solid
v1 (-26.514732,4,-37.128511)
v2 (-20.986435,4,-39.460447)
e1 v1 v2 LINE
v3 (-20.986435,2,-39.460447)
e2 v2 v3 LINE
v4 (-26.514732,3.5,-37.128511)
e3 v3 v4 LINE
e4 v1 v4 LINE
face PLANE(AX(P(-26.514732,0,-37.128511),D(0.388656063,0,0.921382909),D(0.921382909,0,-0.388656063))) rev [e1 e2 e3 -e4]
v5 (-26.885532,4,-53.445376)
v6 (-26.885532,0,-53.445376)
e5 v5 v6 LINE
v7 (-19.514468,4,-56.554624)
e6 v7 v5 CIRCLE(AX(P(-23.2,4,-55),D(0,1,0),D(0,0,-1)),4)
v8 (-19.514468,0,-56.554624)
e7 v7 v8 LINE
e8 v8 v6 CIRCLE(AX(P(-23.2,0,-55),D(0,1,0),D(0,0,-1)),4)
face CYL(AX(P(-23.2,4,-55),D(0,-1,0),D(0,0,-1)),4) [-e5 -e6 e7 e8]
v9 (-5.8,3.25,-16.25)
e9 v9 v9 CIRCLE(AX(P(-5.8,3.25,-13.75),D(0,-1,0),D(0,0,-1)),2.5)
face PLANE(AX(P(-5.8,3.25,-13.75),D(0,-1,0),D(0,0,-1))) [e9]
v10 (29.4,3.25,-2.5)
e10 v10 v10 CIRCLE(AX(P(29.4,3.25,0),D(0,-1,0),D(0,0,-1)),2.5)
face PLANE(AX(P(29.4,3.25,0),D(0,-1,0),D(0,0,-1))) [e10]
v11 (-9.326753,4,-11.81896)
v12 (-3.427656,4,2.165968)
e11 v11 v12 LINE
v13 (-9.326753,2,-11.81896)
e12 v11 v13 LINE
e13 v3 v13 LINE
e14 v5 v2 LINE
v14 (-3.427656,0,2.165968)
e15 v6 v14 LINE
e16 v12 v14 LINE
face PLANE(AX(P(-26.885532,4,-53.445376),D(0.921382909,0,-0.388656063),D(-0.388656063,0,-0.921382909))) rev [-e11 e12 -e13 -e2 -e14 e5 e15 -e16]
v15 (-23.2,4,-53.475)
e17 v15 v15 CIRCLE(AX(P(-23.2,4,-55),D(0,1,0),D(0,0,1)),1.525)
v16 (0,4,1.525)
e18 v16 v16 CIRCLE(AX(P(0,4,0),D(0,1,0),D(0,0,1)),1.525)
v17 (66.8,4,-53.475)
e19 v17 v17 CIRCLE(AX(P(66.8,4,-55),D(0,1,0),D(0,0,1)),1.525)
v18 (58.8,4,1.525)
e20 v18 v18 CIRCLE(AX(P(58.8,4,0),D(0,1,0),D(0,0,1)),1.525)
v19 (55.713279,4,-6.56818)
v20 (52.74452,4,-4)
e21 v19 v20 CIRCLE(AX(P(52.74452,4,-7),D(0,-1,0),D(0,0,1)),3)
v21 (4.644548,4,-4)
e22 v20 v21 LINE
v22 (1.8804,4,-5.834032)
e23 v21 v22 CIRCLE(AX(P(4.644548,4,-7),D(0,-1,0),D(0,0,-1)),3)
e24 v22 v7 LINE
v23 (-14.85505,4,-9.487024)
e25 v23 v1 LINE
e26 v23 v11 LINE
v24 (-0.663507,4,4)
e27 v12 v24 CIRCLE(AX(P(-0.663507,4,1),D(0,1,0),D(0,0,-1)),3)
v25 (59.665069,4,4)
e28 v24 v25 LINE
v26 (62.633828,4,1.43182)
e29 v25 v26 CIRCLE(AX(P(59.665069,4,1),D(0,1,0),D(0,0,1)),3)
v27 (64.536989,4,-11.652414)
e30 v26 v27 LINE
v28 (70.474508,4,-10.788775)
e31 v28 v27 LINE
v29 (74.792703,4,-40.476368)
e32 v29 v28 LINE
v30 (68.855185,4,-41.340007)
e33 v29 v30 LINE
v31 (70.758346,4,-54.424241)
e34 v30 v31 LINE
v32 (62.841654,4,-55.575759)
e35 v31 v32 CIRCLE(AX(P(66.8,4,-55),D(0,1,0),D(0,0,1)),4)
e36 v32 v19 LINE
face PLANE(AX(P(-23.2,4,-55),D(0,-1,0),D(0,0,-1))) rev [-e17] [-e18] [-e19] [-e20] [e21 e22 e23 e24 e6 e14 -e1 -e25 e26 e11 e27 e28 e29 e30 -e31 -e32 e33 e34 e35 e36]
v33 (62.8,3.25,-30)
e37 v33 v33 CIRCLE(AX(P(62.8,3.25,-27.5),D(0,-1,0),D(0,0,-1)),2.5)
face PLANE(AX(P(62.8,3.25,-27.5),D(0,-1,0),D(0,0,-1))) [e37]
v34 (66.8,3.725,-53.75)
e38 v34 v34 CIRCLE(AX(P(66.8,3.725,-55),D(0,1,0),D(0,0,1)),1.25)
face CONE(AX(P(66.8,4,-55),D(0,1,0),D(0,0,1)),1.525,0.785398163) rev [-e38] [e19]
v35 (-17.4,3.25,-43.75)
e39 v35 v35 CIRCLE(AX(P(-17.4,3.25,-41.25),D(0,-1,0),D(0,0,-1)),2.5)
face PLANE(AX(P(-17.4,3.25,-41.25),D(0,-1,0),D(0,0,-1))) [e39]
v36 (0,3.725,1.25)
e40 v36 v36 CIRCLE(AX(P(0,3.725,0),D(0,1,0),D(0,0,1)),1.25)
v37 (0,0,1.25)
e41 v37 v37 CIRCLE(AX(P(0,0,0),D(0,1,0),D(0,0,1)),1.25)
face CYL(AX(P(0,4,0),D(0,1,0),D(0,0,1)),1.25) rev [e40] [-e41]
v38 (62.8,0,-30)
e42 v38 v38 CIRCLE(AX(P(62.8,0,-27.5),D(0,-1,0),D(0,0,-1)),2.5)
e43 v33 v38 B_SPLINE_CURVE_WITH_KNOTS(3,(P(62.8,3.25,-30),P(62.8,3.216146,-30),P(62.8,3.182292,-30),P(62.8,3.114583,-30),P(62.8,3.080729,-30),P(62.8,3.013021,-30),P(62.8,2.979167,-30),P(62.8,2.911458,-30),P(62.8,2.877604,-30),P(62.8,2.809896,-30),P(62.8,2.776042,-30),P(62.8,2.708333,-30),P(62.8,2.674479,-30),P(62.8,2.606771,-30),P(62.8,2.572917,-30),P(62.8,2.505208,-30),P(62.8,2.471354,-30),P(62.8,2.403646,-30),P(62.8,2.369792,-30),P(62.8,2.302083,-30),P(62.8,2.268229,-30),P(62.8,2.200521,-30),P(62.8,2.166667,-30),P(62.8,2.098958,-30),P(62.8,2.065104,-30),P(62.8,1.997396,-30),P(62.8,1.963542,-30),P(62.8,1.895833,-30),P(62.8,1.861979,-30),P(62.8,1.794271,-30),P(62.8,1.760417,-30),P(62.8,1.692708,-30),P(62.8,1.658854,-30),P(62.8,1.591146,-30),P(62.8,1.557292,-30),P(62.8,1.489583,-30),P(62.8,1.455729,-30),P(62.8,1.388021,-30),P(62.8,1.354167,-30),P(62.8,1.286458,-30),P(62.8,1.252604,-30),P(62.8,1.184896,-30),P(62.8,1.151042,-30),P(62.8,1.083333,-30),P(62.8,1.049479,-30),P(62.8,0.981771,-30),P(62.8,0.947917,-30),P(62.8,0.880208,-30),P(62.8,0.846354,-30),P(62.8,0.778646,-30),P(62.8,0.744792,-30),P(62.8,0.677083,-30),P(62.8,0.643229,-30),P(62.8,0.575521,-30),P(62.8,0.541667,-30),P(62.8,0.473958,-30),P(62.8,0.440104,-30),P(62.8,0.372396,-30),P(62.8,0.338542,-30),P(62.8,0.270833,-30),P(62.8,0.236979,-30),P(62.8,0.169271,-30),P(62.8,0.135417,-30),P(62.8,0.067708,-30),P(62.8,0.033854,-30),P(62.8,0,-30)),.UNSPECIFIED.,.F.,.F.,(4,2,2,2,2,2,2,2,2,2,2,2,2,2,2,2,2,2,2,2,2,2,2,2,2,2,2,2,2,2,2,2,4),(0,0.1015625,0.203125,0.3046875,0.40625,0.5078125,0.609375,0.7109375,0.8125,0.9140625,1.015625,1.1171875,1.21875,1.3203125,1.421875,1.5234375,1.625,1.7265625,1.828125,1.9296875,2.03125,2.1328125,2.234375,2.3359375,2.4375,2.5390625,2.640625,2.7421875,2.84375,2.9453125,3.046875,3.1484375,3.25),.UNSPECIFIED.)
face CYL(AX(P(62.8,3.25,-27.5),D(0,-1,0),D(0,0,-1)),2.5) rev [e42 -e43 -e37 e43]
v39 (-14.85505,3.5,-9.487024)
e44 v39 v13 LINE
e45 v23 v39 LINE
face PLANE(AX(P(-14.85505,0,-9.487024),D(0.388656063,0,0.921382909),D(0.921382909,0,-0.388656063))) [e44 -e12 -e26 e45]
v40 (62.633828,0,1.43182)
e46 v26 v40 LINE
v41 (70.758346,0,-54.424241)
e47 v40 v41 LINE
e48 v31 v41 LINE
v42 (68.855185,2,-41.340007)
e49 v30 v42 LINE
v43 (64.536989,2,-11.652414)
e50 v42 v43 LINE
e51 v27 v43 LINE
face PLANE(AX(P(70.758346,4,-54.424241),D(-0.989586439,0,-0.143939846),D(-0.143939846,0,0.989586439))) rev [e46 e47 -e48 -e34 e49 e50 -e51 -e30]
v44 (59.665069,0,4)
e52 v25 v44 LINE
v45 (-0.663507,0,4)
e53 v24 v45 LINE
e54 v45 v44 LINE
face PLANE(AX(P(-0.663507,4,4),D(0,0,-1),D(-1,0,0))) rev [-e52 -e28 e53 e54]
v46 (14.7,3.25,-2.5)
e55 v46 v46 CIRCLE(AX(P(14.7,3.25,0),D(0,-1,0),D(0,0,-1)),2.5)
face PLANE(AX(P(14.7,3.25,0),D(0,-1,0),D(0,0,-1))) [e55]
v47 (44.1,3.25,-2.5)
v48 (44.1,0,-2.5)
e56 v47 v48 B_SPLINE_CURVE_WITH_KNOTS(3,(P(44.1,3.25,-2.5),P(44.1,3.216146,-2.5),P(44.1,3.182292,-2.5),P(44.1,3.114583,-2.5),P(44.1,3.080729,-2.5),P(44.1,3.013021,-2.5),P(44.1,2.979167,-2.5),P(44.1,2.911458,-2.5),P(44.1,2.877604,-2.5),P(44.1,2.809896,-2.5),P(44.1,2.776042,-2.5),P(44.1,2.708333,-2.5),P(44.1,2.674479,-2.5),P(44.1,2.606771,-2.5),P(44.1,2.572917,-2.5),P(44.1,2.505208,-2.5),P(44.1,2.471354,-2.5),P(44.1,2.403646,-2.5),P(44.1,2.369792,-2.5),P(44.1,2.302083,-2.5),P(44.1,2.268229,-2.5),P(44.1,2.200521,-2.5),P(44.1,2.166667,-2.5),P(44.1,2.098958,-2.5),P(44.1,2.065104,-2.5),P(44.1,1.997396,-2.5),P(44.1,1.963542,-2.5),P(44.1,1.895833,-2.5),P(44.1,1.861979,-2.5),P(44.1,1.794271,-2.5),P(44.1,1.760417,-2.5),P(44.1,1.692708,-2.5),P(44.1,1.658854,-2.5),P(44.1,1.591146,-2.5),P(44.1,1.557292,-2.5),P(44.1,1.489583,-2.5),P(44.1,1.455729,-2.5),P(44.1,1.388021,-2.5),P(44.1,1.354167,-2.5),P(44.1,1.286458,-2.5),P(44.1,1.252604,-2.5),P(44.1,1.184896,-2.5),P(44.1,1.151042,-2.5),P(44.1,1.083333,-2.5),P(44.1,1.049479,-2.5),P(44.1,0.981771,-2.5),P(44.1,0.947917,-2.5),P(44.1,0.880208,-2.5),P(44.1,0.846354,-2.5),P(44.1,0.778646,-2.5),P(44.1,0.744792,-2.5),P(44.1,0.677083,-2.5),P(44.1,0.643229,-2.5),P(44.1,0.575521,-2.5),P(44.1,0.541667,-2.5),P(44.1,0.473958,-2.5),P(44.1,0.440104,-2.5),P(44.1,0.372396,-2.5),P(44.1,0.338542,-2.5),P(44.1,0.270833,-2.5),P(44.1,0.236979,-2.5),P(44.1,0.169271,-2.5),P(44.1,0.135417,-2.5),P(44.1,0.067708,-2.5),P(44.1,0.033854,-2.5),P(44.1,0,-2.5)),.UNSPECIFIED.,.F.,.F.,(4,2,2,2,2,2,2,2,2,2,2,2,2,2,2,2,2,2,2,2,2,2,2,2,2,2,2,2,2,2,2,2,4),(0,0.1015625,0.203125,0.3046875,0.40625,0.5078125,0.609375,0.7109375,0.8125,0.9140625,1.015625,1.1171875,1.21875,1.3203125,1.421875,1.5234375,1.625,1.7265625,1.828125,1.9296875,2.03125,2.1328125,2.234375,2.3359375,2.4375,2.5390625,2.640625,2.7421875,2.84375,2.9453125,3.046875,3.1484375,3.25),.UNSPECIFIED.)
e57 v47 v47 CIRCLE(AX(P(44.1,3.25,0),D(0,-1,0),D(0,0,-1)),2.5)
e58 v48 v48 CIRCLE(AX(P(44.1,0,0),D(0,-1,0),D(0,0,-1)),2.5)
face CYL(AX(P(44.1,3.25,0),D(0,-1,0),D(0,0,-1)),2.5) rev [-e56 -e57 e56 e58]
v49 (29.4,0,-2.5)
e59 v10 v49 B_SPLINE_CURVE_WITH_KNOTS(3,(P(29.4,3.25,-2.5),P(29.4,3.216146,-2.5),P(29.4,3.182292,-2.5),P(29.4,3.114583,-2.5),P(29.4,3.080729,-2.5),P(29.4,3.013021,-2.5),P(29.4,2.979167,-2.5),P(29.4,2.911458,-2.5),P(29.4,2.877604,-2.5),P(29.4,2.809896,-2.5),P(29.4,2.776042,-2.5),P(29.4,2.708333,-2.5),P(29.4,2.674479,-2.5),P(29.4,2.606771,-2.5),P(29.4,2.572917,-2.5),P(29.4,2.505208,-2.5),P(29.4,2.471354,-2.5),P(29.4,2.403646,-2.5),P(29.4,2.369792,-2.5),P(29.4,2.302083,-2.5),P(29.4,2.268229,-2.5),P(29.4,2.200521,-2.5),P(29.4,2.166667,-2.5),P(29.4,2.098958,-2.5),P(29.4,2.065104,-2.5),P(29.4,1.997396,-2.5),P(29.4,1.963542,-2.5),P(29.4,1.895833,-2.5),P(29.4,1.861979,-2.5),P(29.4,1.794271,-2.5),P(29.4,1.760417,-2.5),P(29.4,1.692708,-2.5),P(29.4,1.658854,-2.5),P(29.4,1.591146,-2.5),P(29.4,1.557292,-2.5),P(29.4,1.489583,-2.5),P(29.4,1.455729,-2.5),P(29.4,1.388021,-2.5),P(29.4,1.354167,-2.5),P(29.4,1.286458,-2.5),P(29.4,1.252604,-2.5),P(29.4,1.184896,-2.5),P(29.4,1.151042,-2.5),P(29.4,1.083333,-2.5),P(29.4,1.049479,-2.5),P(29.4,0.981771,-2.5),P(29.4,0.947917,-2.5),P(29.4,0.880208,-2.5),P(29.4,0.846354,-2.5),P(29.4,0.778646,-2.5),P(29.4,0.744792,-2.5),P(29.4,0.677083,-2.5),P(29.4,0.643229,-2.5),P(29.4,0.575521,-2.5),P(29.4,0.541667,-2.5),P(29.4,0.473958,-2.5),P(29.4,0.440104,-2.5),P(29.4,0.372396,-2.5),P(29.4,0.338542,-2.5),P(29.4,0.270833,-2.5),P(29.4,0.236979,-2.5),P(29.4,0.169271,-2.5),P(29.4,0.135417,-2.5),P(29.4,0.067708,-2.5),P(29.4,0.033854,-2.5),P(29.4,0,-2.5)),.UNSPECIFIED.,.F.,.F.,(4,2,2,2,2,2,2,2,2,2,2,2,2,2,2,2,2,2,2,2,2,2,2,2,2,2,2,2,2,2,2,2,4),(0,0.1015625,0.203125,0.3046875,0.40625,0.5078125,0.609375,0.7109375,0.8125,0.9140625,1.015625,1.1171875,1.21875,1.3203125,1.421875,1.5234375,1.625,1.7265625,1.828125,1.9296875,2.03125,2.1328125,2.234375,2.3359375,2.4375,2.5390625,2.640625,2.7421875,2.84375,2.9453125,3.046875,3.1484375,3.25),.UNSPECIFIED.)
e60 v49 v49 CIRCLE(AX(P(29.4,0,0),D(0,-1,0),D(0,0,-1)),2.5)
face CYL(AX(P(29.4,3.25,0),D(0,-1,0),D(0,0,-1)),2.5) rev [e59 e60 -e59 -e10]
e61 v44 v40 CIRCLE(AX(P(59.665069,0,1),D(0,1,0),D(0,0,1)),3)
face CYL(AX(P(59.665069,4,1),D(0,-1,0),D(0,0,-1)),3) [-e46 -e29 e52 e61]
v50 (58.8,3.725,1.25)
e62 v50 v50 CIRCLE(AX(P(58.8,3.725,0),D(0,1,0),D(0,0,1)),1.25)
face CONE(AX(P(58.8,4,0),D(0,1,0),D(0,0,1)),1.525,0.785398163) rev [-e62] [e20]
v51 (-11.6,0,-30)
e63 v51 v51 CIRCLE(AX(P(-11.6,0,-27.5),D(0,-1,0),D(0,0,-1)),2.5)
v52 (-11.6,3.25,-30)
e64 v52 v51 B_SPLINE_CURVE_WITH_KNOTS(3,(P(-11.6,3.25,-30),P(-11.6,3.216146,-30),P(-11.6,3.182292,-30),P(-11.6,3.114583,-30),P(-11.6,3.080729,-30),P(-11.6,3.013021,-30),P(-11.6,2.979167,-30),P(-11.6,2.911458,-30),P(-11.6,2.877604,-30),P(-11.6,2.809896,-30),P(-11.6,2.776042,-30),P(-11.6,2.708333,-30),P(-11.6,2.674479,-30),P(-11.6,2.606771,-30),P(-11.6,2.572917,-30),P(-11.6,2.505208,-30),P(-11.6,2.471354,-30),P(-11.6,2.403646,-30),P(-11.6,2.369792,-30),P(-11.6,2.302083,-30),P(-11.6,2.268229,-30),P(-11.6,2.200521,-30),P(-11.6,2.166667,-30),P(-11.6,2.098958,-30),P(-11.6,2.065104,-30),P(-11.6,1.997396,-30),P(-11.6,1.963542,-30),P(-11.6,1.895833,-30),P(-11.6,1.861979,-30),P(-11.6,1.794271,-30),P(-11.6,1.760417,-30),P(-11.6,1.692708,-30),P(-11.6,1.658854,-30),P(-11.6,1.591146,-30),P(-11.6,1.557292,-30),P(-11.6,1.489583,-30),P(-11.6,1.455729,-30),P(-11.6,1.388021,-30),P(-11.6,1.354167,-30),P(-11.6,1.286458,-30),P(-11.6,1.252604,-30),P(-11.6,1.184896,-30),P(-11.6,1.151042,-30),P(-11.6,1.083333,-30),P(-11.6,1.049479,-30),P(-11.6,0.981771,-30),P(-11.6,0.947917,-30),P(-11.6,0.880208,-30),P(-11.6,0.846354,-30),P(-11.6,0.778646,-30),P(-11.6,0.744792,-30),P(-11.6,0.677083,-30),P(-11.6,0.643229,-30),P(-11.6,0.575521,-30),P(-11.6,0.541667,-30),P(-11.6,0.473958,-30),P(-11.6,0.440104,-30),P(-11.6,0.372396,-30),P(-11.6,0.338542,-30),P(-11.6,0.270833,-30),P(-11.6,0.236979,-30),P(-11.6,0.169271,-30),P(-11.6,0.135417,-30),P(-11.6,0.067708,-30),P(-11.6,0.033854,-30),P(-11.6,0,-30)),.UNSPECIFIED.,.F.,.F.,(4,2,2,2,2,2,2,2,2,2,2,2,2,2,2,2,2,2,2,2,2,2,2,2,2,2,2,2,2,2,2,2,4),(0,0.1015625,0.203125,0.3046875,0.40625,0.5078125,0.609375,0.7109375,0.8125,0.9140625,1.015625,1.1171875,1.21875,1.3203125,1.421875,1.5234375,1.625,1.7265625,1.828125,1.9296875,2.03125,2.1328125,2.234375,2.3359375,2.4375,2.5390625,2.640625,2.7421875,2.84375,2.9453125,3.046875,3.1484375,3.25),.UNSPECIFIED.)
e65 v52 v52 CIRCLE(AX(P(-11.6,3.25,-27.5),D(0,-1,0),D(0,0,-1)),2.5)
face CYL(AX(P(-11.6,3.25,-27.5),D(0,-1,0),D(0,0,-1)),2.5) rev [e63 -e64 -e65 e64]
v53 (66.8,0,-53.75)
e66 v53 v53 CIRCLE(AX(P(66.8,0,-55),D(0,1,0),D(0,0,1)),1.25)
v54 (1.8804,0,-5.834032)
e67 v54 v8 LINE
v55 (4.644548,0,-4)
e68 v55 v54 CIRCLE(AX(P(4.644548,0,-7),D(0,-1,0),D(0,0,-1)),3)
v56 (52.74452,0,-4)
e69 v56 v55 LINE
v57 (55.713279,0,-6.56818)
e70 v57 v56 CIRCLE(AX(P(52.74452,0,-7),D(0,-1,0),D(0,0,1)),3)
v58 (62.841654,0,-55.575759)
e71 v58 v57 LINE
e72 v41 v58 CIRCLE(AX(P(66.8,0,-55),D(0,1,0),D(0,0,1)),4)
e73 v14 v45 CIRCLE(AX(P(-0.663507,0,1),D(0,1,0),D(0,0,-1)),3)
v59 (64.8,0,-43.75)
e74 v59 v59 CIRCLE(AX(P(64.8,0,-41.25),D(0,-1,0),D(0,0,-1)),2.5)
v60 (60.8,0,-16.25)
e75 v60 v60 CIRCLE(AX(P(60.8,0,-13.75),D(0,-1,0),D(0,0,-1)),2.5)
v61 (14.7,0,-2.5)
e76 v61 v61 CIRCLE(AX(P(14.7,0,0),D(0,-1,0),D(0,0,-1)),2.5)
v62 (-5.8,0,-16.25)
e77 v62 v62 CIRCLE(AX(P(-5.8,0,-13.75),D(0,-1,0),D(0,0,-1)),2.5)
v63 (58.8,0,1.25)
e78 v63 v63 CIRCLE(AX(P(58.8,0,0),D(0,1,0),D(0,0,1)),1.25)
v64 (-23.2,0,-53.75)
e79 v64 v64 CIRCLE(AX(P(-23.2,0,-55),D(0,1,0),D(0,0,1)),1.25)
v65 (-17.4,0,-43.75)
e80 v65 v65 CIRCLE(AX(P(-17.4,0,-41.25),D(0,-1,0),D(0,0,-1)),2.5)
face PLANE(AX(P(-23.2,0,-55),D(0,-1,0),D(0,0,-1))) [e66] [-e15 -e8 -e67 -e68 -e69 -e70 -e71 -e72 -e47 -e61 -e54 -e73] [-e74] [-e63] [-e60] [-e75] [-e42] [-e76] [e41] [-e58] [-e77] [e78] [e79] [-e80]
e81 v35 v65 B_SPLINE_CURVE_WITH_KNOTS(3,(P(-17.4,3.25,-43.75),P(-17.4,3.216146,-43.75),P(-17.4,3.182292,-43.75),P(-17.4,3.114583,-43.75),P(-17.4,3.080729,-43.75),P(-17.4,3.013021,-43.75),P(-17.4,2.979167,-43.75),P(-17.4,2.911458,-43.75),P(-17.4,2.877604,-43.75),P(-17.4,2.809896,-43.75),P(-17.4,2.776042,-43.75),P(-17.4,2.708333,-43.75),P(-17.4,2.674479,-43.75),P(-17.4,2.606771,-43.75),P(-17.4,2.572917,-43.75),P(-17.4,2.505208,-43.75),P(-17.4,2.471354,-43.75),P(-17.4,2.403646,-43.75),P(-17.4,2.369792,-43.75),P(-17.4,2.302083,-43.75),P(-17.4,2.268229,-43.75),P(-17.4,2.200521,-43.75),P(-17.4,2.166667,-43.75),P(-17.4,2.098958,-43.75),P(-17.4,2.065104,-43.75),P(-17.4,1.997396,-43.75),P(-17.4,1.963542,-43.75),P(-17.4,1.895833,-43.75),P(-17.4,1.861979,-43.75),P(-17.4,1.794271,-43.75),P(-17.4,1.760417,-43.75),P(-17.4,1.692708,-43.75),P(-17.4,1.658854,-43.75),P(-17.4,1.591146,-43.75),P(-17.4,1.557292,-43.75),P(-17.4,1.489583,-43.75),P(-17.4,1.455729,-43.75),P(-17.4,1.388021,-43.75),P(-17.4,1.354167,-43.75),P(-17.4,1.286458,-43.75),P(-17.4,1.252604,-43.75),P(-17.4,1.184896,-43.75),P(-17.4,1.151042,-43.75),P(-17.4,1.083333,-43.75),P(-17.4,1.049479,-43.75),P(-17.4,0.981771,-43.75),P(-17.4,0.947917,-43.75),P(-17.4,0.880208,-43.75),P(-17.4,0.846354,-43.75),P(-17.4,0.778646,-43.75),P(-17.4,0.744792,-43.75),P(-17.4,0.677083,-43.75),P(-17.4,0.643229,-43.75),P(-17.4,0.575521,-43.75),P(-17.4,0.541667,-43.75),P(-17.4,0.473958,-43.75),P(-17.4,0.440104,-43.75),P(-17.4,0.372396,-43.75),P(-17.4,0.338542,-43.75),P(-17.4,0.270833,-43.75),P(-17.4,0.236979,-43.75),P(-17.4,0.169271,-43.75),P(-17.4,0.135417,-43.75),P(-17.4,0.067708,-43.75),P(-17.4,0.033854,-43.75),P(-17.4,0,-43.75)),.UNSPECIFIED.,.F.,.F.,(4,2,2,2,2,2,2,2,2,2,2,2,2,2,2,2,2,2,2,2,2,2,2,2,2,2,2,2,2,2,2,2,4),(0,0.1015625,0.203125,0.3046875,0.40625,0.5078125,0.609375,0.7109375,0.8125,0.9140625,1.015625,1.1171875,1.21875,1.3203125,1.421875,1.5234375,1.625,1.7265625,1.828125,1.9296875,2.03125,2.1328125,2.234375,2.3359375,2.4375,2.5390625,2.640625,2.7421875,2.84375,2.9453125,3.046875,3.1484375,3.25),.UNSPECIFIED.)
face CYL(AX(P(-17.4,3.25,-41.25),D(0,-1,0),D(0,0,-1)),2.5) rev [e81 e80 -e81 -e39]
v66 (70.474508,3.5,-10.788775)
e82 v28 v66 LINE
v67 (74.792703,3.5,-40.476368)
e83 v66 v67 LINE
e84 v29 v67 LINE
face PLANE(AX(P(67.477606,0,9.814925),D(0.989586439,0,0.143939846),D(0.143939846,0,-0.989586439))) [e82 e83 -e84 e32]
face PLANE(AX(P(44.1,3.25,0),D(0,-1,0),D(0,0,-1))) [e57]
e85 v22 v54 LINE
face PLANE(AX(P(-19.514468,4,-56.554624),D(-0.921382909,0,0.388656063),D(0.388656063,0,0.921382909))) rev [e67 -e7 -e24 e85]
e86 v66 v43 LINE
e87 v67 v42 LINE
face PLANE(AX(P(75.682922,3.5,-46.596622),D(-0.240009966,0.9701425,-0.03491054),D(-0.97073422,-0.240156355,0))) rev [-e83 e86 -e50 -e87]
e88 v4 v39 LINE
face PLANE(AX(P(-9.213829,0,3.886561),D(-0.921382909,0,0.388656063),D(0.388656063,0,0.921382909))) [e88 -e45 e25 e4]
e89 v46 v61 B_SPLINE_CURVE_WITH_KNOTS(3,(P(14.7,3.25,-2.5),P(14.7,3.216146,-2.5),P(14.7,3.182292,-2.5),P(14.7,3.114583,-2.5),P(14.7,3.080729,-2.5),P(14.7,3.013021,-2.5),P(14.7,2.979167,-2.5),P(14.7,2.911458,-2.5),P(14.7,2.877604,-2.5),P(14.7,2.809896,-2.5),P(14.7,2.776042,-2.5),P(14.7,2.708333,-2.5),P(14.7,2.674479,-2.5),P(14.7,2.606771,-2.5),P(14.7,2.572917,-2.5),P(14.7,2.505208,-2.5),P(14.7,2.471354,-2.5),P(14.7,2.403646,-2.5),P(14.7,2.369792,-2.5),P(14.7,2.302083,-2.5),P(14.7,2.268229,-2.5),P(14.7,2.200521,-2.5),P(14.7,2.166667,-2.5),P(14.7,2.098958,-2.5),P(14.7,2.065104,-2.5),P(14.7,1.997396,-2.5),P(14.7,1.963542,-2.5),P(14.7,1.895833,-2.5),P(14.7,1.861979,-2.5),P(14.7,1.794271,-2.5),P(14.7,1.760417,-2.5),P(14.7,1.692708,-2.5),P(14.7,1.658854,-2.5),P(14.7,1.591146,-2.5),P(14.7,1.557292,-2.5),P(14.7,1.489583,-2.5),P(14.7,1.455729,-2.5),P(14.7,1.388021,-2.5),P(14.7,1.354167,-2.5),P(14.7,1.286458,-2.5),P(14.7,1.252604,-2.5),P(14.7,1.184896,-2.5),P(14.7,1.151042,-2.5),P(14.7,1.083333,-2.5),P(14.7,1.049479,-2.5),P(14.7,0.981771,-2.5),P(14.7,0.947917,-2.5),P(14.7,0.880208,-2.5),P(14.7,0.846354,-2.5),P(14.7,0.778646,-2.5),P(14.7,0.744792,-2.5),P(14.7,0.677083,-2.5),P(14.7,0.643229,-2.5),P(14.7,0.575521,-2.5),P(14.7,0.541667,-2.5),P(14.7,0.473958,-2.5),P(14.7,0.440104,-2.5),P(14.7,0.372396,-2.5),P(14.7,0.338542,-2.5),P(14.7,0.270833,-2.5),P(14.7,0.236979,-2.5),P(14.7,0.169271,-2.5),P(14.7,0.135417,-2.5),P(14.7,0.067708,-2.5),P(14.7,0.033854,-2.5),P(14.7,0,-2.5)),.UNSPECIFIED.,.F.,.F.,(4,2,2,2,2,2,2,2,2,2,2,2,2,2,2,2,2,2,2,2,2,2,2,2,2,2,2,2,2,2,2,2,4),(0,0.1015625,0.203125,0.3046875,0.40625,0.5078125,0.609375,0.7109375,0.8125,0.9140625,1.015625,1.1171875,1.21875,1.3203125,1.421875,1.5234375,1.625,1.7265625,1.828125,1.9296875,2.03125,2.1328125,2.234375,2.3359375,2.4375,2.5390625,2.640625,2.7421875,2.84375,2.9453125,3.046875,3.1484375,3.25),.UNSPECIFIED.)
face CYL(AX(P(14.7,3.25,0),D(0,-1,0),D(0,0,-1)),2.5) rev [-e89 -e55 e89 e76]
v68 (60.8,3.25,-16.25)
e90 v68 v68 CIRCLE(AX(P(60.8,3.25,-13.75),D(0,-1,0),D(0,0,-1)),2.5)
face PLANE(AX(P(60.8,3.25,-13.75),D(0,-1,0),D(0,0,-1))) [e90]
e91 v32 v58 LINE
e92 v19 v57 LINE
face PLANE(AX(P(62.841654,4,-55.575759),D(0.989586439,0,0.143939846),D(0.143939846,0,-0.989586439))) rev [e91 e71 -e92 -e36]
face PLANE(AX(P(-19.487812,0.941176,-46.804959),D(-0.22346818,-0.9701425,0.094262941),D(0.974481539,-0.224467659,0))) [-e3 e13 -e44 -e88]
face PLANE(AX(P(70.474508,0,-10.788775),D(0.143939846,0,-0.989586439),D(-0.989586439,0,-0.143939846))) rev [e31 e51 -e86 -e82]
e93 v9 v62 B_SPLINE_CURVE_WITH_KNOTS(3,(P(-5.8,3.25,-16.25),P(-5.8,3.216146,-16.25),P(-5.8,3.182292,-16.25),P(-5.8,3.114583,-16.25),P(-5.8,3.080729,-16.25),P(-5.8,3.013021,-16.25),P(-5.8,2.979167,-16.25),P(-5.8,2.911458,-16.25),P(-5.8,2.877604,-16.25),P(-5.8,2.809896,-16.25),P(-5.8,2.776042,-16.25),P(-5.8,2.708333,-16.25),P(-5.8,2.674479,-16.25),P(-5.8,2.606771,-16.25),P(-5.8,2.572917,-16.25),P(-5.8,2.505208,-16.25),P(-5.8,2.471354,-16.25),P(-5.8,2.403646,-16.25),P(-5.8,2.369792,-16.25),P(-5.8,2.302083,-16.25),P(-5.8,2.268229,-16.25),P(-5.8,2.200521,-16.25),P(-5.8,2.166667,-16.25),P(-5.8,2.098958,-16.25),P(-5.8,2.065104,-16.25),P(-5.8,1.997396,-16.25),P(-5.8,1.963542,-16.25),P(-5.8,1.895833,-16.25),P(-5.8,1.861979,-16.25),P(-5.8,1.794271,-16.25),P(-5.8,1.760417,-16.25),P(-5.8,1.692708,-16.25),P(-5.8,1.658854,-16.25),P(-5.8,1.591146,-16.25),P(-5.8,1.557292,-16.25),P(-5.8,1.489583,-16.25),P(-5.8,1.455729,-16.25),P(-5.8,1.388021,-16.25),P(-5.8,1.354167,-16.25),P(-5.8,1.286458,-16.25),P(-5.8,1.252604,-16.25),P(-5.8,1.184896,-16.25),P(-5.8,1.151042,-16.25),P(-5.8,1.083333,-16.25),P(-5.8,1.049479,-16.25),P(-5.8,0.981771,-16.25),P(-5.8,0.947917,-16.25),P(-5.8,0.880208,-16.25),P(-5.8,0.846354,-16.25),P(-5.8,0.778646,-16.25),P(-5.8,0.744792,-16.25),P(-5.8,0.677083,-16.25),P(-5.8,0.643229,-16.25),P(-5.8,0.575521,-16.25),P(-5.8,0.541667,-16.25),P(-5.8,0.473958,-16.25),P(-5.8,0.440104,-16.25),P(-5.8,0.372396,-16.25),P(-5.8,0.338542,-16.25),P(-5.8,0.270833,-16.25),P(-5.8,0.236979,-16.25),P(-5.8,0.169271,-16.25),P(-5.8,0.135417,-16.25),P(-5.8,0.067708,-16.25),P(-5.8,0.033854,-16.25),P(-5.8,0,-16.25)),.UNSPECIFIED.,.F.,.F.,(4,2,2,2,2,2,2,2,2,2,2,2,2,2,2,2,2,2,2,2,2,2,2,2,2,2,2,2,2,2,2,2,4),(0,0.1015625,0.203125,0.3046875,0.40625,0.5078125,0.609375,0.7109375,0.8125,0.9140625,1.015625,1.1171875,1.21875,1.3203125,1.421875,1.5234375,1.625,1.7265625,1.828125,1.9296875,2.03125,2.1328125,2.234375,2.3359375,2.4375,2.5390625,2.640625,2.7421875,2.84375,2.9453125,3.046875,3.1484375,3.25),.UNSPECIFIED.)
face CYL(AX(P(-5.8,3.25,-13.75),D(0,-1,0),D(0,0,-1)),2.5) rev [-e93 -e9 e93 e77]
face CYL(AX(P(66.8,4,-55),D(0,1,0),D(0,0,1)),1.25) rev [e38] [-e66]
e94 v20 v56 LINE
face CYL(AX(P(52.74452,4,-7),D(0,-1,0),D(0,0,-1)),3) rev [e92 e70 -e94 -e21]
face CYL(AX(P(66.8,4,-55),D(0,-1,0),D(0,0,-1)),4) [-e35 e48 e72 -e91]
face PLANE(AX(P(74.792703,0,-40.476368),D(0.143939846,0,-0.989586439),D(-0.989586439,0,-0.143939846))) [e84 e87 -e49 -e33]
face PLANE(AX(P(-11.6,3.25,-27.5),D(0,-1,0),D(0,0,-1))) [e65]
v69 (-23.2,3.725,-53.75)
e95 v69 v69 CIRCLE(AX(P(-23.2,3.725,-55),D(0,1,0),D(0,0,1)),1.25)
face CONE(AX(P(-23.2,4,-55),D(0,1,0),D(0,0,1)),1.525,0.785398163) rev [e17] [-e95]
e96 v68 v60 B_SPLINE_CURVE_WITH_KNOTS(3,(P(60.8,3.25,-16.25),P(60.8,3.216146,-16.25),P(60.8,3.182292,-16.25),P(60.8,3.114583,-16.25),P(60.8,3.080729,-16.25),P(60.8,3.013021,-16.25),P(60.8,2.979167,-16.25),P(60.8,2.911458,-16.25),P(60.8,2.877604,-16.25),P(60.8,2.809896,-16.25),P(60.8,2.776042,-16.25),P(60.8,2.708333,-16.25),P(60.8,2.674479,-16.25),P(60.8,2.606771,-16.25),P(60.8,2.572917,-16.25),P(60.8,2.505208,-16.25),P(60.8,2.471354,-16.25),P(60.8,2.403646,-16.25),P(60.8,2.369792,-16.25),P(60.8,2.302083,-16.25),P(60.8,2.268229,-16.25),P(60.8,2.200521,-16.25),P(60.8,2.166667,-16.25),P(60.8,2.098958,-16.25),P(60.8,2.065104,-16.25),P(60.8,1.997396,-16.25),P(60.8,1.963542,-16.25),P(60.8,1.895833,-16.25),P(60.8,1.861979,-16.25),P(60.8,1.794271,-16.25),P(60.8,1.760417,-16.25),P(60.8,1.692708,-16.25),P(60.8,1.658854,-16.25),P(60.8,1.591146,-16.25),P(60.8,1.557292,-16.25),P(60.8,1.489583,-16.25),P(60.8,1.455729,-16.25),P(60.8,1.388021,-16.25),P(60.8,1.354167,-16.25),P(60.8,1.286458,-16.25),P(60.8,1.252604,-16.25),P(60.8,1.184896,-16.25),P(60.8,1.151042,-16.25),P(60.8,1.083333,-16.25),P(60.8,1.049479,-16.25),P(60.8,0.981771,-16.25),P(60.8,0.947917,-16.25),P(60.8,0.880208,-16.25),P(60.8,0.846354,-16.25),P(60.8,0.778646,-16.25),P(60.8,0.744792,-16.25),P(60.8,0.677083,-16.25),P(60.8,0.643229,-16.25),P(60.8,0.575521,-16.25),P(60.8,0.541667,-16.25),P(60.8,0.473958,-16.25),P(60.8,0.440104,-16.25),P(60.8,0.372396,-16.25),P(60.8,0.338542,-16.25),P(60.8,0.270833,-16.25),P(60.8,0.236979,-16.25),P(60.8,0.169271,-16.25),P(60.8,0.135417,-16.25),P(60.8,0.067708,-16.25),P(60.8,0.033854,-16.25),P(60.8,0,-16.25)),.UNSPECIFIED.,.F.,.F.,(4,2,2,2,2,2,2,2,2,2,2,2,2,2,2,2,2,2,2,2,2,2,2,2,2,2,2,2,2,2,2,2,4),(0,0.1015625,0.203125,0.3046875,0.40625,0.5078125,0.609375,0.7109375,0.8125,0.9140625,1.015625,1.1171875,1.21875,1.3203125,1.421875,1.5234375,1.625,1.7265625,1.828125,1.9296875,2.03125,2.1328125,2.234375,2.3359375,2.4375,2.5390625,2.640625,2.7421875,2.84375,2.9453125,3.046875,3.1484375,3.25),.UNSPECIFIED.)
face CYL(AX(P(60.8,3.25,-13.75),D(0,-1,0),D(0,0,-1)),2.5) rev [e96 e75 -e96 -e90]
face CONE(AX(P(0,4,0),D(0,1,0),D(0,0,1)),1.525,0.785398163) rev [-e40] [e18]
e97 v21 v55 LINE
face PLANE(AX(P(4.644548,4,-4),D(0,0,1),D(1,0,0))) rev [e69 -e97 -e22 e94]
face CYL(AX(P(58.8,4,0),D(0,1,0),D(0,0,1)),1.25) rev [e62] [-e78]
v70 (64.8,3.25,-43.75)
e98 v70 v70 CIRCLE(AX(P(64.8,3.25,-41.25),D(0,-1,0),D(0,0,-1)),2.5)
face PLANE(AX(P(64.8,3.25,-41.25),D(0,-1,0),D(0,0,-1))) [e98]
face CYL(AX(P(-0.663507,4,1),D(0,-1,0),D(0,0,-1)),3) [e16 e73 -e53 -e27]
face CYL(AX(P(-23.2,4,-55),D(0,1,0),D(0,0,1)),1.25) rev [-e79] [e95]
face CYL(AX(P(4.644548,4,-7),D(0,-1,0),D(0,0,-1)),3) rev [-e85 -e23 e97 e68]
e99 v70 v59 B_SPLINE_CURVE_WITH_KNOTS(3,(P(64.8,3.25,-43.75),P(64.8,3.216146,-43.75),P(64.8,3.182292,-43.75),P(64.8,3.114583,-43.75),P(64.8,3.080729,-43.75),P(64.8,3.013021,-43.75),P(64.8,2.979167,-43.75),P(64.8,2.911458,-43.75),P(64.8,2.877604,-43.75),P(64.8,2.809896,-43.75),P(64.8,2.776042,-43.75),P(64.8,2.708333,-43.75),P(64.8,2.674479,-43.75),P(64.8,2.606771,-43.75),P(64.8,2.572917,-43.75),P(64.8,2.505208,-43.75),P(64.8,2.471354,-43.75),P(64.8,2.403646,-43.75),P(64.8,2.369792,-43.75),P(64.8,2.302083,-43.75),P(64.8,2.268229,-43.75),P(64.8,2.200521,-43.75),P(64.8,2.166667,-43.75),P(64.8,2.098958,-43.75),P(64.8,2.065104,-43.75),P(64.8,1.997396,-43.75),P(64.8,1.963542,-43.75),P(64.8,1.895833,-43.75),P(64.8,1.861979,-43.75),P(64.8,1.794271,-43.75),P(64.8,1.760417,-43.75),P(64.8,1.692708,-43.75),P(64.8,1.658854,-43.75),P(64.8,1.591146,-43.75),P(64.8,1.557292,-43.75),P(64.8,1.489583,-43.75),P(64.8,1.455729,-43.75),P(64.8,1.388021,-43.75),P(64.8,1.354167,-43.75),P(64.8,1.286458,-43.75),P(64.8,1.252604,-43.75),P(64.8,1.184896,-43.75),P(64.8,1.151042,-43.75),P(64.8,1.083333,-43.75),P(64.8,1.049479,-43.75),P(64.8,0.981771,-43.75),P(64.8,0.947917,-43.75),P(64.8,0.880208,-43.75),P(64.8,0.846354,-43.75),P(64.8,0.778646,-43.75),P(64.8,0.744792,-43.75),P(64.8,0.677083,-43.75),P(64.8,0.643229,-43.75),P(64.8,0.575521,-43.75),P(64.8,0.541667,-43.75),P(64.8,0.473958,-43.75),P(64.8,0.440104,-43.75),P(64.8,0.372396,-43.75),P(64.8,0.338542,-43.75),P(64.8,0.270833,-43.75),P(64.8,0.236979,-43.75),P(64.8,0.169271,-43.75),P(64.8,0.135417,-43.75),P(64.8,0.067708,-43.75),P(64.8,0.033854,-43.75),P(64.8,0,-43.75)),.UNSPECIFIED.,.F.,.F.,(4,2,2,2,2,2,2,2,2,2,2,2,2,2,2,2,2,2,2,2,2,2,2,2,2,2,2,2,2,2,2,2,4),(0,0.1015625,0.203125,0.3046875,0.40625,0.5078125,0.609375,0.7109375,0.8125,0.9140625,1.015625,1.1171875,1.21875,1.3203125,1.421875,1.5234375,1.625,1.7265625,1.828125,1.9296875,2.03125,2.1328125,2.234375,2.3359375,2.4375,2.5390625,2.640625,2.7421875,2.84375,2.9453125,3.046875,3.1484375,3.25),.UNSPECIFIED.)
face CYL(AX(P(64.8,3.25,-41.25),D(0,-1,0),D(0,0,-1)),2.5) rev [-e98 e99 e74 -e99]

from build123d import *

# Parameters (mm, degrees)
BOSS_EXTRUDE1_DEPTH = 4
SKETCH5_R           = 2.5
CUT_EXTRUDE1_DEPTH  = 3.25
SKETCH6_W           = 30
SKETCH6_H           = 0.5
BOSS_EXTRUDE2_DEPTH = 6
BOSS_EXTRUDE3_DEPTH = 30
SKETCH8_W           = 30
SKETCH8_H           = 0.5
BOSS_EXTRUDE4_DEPTH = 6
BOSS_EXTRUDE5_DEPTH = 30


# Read off the part's stored shape, not the designer's step: M3x0.5 Tapped Hole1
with BuildPart() as part:
    # Sketch1 → Boss-Extrude1 (new body)
    with BuildSketch(Plane(origin=(0, 0, 0), x_dir=(1, 0, 0), z_dir=(0, 1, 0))):
        with BuildLine():
            Line((-26.885531635, 53.445375747), (-3.427655647, -2.16596819))
            ThreePointArc((-3.427655647, -2.16596819), (-2.322135184, -3.499790448), (-0.663506921, -4))
            Line((-0.663506921, -4), (59.665068599, -4))
            ThreePointArc((59.665068599, -4), (61.627788827, -3.268860795), (62.633827917, -1.431819537))
            Line((62.633827917, -1.431819537), (70.758345757, 54.424240617))
            ThreePointArc((70.758345757, 54.424240617), (67.375759383, 58.958345757), (62.841654243, 55.575759383))
            Line((62.841654243, 55.575759383), (55.713279127, 6.568180463))
            ThreePointArc((55.713279127, 6.568180463), (54.707240038, 4.731139205), (52.744519809, 4))
            Line((52.744519809, 4), (4.644548446, 4))
            ThreePointArc((4.644548446, 4), (2.985920183, 4.500209552), (1.88039972, 5.83403181))
            Line((1.88039972, 5.83403181), (-19.514468365, 56.554624253))
            ThreePointArc((-19.514468365, 56.554624253), (-24.754624253, 58.685531635), (-26.885531635, 53.445375747))
        make_face()
    extrude(amount=BOSS_EXTRUDE1_DEPTH)

    # M3x0.5 Tapped Hole1 outline → M3x0.5 Tapped Hole1 (revolve, cut)
    with BuildSketch(Plane(origin=(-23.2, 0, -55), x_dir=(1, 0, 0), z_dir=(0, 0, 1))):
        Polygon((0, 0), (1.25, 0), (1.25, 3.725), (1.525, 4), (0, 4), align=None)
    revolve(axis=Axis((-23.2, 0, -55), (0, 1, 0)), mode=Mode.SUBTRACT)

    # M3x0.5 Tapped Hole1 2 outline → M3x0.5 Tapped Hole1 2 (revolve, cut)
    with BuildSketch(Plane.XY):
        Polygon((0, 0), (1.25, 0), (1.25, 3.725), (1.525, 4), (0, 4), align=None)
    revolve(axis=Axis((0, 0, 0), (0, 1, 0)), mode=Mode.SUBTRACT)

    # M3x0.5 Tapped Hole1 3 outline → M3x0.5 Tapped Hole1 3 (revolve, cut)
    with BuildSketch(Plane(origin=(58.8, 0, 0), x_dir=(1, 0, 0), z_dir=(0, 0, 1))):
        Polygon((0, 0), (1.25, 0), (1.25, 3.725), (1.525, 4), (0, 4), align=None)
    revolve(axis=Axis((58.8, 0, 0), (0, 1, 0)), mode=Mode.SUBTRACT)

    # M3x0.5 Tapped Hole1 4 outline → M3x0.5 Tapped Hole1 4 (revolve, cut)
    with BuildSketch(Plane(origin=(66.8, 0, -55), x_dir=(1, 0, 0), z_dir=(0, 0, 1))):
        Polygon((0, 0), (1.25, 0), (1.25, 3.725), (1.525, 4), (0, 4), align=None)
    revolve(axis=Axis((66.8, 0, -55), (0, 1, 0)), mode=Mode.SUBTRACT)

    # Sketch5 → Cut-Extrude1 (cut)
    with BuildSketch(Plane.XZ):
        with Locations(Location((-17.4, -41.25, 0), (0, 0, 270))):
            Circle(SKETCH5_R)
        with Locations(Location((29.4, 0, 0), (0, 0, 270))):
            Circle(SKETCH5_R)
        with Locations(Location((60.8, -13.75, 0), (0, 0, 270))):
            Circle(SKETCH5_R)
        with Locations(Location((-5.8, -13.75, 0), (0, 0, 270))):
            Circle(SKETCH5_R)
        with Locations(Location((64.8, -41.25, 0), (0, 0, 270))):
            Circle(SKETCH5_R)
        with Locations(Location((-11.6, -27.5, 0), (0, 0, 270))):
            Circle(SKETCH5_R)
        with Locations(Location((14.7, 0, 0), (0, 0, 270))):
            Circle(SKETCH5_R)
        with Locations(Location((44.1, 0, 0), (0, 0, 270))):
            Circle(SKETCH5_R)
        with Locations(Location((62.8, -27.5, 0), (0, 0, 270))):
            Circle(SKETCH5_R)
    extrude(amount=-CUT_EXTRUDE1_DEPTH, mode=Mode.SUBTRACT)

    # Sketch6 → Boss-Extrude2 (add)
    with BuildSketch(Plane(origin=(-3.685531635, 0, 1.554624253), x_dir=(0.38865606330829405, 0, 0.921382908705007), z_dir=(-0.921382908705007, 0, 0.38865606330829405))):
        with Locations((-29.514686863, 3.75)):
            Rectangle(SKETCH6_W, SKETCH6_H)
    extrude(amount=BOSS_EXTRUDE2_DEPTH)

    # Sketch7 → Boss-Extrude3 (add)
    with BuildSketch(Plane(origin=(-5.641221056, 0, -13.373584401), x_dir=(0.9213829087050069, 0, -0.3886560633082941), z_dir=(0.3886560633082942, 0, 0.921382908705007))):
        Polygon((-4, 2), (-4, 3.5), (-10, 3.5), align=None)
    extrude(amount=-BOSS_EXTRUDE3_DEPTH)

    # Sketch8 → Boss-Extrude4 (add)
    with BuildSketch(Plane(origin=(61.540087421, 0, 8.951285443), x_dir=(0.14393984571411056, 0, -0.9895864392845114), z_dir=(0.9895864392845114, 0, 0.14393984571411056))):
        with Locations((35.820515092, 3.75)):
            Rectangle(SKETCH8_W, SKETCH8_H)
    extrude(amount=BOSS_EXTRUDE4_DEPTH)

    # Sketch9 → Boss-Extrude5 (add)
    with BuildSketch(Plane(origin=(2.99690173, 0, -20.603699394), x_dir=(0.9895864392845114, 0, 0.14393984571411056), z_dir=(-0.14393984571411056, 0, 0.9895864392845114))):
        Polygon((68.18768263, 3.5), (62.18768263, 3.5), (62.18768263, 2), align=None)
    extrude(amount=-BOSS_EXTRUDE5_DEPTH)


solid = part.part
